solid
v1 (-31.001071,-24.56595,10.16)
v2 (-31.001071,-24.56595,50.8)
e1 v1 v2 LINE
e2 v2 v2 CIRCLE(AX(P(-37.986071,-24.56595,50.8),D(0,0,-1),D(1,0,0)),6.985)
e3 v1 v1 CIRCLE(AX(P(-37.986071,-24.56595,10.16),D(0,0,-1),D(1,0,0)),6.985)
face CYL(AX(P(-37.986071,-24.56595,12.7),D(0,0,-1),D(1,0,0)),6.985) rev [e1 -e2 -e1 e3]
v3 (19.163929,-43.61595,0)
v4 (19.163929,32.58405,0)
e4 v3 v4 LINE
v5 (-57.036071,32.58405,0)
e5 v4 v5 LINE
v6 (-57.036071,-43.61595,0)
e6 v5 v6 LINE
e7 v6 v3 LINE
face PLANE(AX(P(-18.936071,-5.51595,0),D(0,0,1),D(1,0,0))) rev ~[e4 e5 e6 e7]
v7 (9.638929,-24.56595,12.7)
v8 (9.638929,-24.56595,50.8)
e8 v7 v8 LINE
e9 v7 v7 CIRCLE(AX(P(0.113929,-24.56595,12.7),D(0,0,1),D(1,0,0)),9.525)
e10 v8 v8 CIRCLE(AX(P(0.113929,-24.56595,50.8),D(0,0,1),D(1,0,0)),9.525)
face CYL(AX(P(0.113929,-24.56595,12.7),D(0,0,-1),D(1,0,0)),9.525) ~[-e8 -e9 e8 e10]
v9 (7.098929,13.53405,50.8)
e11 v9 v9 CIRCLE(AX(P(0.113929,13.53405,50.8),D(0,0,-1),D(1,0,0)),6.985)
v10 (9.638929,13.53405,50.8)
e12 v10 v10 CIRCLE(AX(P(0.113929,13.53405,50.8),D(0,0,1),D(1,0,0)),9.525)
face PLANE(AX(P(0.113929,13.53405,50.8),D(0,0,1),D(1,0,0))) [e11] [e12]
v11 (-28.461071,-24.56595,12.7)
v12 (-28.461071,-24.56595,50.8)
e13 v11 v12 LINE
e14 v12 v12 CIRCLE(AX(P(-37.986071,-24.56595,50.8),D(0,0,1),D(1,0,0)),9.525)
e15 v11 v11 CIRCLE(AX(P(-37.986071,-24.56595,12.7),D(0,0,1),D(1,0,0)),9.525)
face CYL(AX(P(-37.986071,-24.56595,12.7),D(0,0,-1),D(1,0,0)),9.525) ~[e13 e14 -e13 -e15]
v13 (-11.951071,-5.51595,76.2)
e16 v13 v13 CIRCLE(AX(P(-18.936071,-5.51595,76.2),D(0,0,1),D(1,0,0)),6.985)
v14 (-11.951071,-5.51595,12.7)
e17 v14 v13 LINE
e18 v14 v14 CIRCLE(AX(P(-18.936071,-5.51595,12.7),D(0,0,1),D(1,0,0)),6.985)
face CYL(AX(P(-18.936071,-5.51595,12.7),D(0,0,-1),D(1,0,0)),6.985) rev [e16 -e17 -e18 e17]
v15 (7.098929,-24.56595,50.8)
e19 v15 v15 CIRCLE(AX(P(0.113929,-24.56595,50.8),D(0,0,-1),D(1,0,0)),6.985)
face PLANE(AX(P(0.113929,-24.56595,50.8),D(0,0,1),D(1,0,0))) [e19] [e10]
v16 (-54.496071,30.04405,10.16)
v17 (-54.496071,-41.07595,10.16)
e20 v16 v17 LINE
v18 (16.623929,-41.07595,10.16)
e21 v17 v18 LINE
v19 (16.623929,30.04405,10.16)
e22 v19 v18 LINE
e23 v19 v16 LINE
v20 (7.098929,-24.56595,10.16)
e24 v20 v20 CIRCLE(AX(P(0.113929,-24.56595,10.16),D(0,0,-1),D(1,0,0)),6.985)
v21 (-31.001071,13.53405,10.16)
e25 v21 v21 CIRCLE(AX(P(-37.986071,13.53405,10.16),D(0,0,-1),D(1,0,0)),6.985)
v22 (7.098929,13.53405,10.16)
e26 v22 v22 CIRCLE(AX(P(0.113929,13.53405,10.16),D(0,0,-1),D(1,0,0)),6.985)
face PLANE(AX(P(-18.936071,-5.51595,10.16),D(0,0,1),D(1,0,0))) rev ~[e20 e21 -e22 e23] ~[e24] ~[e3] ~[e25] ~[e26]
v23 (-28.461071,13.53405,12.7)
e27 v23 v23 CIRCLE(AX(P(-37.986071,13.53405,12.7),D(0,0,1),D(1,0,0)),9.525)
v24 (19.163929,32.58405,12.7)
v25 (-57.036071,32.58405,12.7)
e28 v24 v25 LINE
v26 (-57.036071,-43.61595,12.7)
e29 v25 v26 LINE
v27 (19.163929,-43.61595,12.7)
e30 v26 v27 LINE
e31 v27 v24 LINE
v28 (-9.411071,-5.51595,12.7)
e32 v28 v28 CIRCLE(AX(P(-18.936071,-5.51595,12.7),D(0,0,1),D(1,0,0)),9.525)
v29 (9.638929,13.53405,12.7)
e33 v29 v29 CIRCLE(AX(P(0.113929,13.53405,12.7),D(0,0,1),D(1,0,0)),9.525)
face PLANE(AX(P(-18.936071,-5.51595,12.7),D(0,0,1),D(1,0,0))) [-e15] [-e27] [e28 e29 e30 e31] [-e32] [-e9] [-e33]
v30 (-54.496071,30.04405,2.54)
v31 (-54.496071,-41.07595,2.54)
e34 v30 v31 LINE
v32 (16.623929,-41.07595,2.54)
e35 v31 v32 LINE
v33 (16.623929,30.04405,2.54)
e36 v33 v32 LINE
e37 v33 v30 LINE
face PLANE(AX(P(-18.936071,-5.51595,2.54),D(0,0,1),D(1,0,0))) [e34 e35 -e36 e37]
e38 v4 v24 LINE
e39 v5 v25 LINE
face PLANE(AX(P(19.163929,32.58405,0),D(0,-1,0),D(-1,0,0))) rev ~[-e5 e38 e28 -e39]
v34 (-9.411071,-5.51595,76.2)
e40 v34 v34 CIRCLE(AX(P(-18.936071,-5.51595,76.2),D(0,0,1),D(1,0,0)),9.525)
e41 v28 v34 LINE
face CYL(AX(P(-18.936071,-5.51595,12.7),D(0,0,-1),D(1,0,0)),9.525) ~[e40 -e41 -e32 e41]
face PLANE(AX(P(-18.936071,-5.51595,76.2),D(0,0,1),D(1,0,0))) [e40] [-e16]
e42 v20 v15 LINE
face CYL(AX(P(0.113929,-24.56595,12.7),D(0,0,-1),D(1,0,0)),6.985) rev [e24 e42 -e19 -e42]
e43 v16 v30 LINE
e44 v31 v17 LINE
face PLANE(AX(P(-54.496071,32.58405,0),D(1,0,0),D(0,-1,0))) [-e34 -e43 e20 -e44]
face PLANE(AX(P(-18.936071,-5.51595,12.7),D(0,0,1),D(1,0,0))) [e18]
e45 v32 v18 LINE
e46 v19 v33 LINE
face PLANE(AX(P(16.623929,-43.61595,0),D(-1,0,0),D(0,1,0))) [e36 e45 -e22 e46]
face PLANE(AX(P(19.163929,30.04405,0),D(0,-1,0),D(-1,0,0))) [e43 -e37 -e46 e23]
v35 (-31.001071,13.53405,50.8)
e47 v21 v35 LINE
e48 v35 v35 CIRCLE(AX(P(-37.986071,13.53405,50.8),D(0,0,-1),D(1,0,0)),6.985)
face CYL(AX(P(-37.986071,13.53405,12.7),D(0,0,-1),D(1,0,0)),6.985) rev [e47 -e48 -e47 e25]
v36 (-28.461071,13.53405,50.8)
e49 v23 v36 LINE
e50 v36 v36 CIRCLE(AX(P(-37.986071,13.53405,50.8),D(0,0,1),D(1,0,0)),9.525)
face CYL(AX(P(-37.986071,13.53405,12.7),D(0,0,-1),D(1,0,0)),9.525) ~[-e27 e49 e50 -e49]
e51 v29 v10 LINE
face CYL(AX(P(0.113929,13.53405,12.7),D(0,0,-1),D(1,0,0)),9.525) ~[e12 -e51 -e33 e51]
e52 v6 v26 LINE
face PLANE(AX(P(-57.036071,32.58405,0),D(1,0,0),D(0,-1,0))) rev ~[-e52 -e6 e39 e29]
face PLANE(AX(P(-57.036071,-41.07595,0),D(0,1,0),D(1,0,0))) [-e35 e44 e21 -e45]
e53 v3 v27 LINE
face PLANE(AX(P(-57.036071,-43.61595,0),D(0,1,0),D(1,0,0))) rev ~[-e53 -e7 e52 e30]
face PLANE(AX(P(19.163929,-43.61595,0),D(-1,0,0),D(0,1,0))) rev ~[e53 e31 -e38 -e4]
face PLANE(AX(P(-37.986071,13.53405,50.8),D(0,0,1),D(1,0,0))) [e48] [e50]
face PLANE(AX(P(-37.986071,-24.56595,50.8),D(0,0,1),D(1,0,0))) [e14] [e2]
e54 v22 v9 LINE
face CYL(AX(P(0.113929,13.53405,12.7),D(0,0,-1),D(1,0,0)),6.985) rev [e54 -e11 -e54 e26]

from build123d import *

# Parameters (mm, degrees)
F1_DEPTH    = 12.7
F2_R        = 9.525
F3_DEPTH    = 38.1
F4_T        = -2.54
F5_R        = 9.525
F6_DEPTH    = 63.5
F7_T        = 2.54
F7_T3_DEPTH = 12.7
F7_T5_DEPTH = 76.2
F7_T7_DEPTH = 76.2


# Not quite as in the source:
# - a shell that OpenCascade refuses in one call is made with other operations: the cavity is built on its own and cut out


with BuildPart() as f1:
    # F0 (on Top) → F1 (new body)
    with BuildSketch(Plane.XY):
        Polygon((-18.9360706136, 32.5840498031), (-57.0360706136, 32.5840498031), (-57.0360706136, -5.5159501969), (-57.0360706136, -43.6159501969), (-18.9360706136, -43.6159501969), (19.1639293864, -43.6159501969), (19.1639293864, -5.5159501969), (19.1639293864, 32.5840498031), align=None)
    extrude(amount=F1_DEPTH)

    # F2 (on face) → F3 (join)
    with BuildSketch(Plane.XY.offset(12.7)):
        with Locations((-37.9860706136, 13.5340498031)):
            Circle(F2_R)
        with Locations((0.1139293864, 13.5340498031)):
            Circle(F2_R)
        with Locations((-37.9860706136, -24.5659501969)):
            Circle(F2_R)
        with Locations((0.1139293864, -24.5659501969)):
            Circle(F2_R)
    extrude(amount=F3_DEPTH)

    # F4
    f4_openings = [f1.faces().sort_by_distance(p)[0] for p in [
        (0.113929, 13.53405, 50.8),
        (0.113929, -24.56595, 50.8),
        (-37.986071, -24.56595, 50.8),
        (-37.986071, 13.53405, 50.8),
    ]]
    offset(amount=F4_T, openings=f4_openings, kind=Kind.INTERSECTION)

    # F5 (on face) → F6 (join)
    with BuildSketch(Plane.XY.offset(12.7)):
        with Locations((-18.9360706136, -5.5159501969)):
            Circle(F5_R)
    extrude(amount=F6_DEPTH)

    # F7: shell of thickness 2.54, made by hand


with BuildPart() as f7_core1:
    # F7_t2: copy of F1
    add(f1.part)

    # the walls: a layer under each face that stays
    f7_faces = [f7_core1.faces().sort_by_distance(p)[0] for p in [
        (-18.9360706136, 30.0440498031, 6.35),
        (16.6239293864, -5.5159501969, 6.35),
        (-18.9360706136, -5.5159501969, 10.16),
        (-54.4960706136, -5.5159501969, 6.35),
        (-18.9360706136, -5.5159501969, 2.54),
        (-18.9360706136, -41.0759501969, 6.35),
        (-44.9710706136, 13.5340498031, 30.48),
        (-44.9710706136, -24.5659501969, 30.48),
        (-6.8710706136, 13.5340498031, 30.48),
        (-6.8710706136, -24.5659501969, 30.48),
        (-44.3360706136, 7.1840498031, 50.8),
        (-44.3360706136, -30.9159501969, 50.8),
        (-6.2360706136, 7.1840498031, 50.8),
        (-6.2360706136, -30.9159501969, 50.8),
        (-47.5110706136, 13.5340498031, 31.75),
        (-47.5110706136, -24.5659501969, 31.75),
        (-9.4110706136, 13.5340498031, 31.75),
        (-9.4110706136, -24.5659501969, 31.75),
        (-44.3360706136, -5.5159501969, 12.7),
        (-18.9360706136, 32.5840498031, 6.35),
        (-57.0360706136, -5.5159501969, 6.35),
        (19.1639293864, -5.5159501969, 6.35),
        (-18.9360706136, -43.6159501969, 6.35),
        (-28.4610706136, -5.5159501969, 44.45),
        (-18.9360706136, -5.5159501969, 0),
    ]]
    thicken(f7_faces, amount=-F7_T, mode=Mode.SUBTRACT)

    # F7_s4 → F7_t3 (cut)
    with BuildSketch(Plane.XY):
        Polygon((16.5985293864, 30.0186498031), (16.6239293864, 32.5840498031), (19.1639293864, 32.5840498031), (19.1639293864, 30.0440498031), align=None)
        Polygon((-54.4706706136, 30.0186498031), (-54.4960706136, 32.5840498031), (-57.0360706136, 32.5840498031), (-57.0360706136, 30.0440498031), align=None)
        Polygon((16.5985293864, -41.0505501969), (19.1639293864, -41.0759501969), (19.1639293864, -43.6159501969), (16.6239293864, -43.6159501969), align=None)
        Polygon((-54.4706706136, -41.0505501969), (-57.0360706136, -41.0759501969), (-57.0360706136, -43.6159501969), (-54.4960706136, -43.6159501969), align=None)
    extrude(amount=F7_T3_DEPTH, mode=Mode.SUBTRACT)

    # F7_s6 → F7_t5 (cut)
    with BuildSketch(Plane.YZ.offset(-57.0360706136)):
        Polygon((30.0186498031, 10.1346), (32.5840498031, 10.16), (32.5840498031, 12.7), (30.0440498031, 12.7), align=None)
        Polygon((30.0186498031, 2.5654), (32.5840498031, 2.54), (32.5840498031, 0), (30.0440498031, 0), align=None)
        Polygon((-41.0505501969, 10.1346), (-41.0759501969, 12.7), (-43.6159501969, 12.7), (-43.6159501969, 10.16), align=None)
        Polygon((-41.0505501969, 2.5654), (-41.0759501969, 0), (-43.6159501969, 0), (-43.6159501969, 2.54), align=None)
    extrude(amount=F7_T5_DEPTH, mode=Mode.SUBTRACT)

    # F7_s8 → F7_t7 (cut)
    with BuildSketch(Plane.XZ.offset(-32.5840498031)):
        Polygon((16.5985293864, 10.1346), (19.1639293864, 10.16), (19.1639293864, 12.7), (16.6239293864, 12.7), align=None)
        Polygon((16.5985293864, 2.5654), (19.1639293864, 2.54), (19.1639293864, 0), (16.6239293864, 0), align=None)
        Polygon((-54.4706706136, 10.1346), (-54.4960706136, 12.7), (-57.0360706136, 12.7), (-57.0360706136, 10.16), align=None)
        Polygon((-54.4706706136, 2.5654), (-57.0360706136, 2.54), (-57.0360706136, 0), (-54.4960706136, 0), align=None)
    extrude(amount=F7_T7_DEPTH, mode=Mode.SUBTRACT)

    # F7_s9 → F7_t10 (revolve, cut)
    with BuildSketch(Plane.XZ.offset(-13.5340498031)):
        Polygon((-28.4356706136, 12.7254), (-31.0010706136, 12.7), (-31.0010706136, 10.16), (-28.4610706136, 10.16), align=None)
    revolve(axis=Axis((-37.9860706136, 13.5340498031, 12.7), (0, 0, 1)), mode=Mode.SUBTRACT)

    # F7_s11 → F7_t12 (revolve, cut)
    with BuildSketch(Plane.XZ.offset(24.5659501969)):
        Polygon((-28.4356706136, 12.7254), (-31.0010706136, 12.7), (-31.0010706136, 10.16), (-28.4610706136, 10.16), align=None)
    revolve(axis=Axis((-37.9860706136, -24.5659501969, 12.7), (0, 0, 1)), mode=Mode.SUBTRACT)

    # F7_s13 → F7_t14 (revolve, cut)
    with BuildSketch(Plane.XZ.offset(-13.5340498031)):
        Polygon((9.6643293864, 12.7254), (7.0989293864, 12.7), (7.0989293864, 10.16), (9.6389293864, 10.16), align=None)
    revolve(axis=Axis((0.1139293864, 13.5340498031, 12.7), (0, 0, 1)), mode=Mode.SUBTRACT)

    # F7_s15 → F7_t16 (revolve, cut)
    with BuildSketch(Plane.XZ.offset(24.5659501969)):
        Polygon((9.6643293864, 12.7254), (7.0989293864, 12.7), (7.0989293864, 10.16), (9.6389293864, 10.16), align=None)
    revolve(axis=Axis((0.1139293864, -24.5659501969, 12.7), (0, 0, 1)), mode=Mode.SUBTRACT)

    # F7_s17 → F7_t18 (revolve, cut)
    with BuildSketch(Plane.XZ.offset(5.5159501969)):
        Polygon((-9.3856706136, 12.7254), (-9.4110706136, 10.16), (-11.9510706136, 10.16), (-11.9510706136, 12.7), align=None)
    revolve(axis=Axis((-18.9360706136, -5.5159501969, 12.7), (0, 0, 1)), mode=Mode.SUBTRACT)


with BuildPart() as f1_1:
    add(f1.part)

    # what is left inside the walls is the cavity
    f7_cavity = [f7_core1.part.solids().sort_by_distance(p)[0] for p in [
        (-25.895671, -5.51595, 55.033333),
    ]]
    add(f7_cavity, mode=Mode.SUBTRACT)


solid = f1_1.part
